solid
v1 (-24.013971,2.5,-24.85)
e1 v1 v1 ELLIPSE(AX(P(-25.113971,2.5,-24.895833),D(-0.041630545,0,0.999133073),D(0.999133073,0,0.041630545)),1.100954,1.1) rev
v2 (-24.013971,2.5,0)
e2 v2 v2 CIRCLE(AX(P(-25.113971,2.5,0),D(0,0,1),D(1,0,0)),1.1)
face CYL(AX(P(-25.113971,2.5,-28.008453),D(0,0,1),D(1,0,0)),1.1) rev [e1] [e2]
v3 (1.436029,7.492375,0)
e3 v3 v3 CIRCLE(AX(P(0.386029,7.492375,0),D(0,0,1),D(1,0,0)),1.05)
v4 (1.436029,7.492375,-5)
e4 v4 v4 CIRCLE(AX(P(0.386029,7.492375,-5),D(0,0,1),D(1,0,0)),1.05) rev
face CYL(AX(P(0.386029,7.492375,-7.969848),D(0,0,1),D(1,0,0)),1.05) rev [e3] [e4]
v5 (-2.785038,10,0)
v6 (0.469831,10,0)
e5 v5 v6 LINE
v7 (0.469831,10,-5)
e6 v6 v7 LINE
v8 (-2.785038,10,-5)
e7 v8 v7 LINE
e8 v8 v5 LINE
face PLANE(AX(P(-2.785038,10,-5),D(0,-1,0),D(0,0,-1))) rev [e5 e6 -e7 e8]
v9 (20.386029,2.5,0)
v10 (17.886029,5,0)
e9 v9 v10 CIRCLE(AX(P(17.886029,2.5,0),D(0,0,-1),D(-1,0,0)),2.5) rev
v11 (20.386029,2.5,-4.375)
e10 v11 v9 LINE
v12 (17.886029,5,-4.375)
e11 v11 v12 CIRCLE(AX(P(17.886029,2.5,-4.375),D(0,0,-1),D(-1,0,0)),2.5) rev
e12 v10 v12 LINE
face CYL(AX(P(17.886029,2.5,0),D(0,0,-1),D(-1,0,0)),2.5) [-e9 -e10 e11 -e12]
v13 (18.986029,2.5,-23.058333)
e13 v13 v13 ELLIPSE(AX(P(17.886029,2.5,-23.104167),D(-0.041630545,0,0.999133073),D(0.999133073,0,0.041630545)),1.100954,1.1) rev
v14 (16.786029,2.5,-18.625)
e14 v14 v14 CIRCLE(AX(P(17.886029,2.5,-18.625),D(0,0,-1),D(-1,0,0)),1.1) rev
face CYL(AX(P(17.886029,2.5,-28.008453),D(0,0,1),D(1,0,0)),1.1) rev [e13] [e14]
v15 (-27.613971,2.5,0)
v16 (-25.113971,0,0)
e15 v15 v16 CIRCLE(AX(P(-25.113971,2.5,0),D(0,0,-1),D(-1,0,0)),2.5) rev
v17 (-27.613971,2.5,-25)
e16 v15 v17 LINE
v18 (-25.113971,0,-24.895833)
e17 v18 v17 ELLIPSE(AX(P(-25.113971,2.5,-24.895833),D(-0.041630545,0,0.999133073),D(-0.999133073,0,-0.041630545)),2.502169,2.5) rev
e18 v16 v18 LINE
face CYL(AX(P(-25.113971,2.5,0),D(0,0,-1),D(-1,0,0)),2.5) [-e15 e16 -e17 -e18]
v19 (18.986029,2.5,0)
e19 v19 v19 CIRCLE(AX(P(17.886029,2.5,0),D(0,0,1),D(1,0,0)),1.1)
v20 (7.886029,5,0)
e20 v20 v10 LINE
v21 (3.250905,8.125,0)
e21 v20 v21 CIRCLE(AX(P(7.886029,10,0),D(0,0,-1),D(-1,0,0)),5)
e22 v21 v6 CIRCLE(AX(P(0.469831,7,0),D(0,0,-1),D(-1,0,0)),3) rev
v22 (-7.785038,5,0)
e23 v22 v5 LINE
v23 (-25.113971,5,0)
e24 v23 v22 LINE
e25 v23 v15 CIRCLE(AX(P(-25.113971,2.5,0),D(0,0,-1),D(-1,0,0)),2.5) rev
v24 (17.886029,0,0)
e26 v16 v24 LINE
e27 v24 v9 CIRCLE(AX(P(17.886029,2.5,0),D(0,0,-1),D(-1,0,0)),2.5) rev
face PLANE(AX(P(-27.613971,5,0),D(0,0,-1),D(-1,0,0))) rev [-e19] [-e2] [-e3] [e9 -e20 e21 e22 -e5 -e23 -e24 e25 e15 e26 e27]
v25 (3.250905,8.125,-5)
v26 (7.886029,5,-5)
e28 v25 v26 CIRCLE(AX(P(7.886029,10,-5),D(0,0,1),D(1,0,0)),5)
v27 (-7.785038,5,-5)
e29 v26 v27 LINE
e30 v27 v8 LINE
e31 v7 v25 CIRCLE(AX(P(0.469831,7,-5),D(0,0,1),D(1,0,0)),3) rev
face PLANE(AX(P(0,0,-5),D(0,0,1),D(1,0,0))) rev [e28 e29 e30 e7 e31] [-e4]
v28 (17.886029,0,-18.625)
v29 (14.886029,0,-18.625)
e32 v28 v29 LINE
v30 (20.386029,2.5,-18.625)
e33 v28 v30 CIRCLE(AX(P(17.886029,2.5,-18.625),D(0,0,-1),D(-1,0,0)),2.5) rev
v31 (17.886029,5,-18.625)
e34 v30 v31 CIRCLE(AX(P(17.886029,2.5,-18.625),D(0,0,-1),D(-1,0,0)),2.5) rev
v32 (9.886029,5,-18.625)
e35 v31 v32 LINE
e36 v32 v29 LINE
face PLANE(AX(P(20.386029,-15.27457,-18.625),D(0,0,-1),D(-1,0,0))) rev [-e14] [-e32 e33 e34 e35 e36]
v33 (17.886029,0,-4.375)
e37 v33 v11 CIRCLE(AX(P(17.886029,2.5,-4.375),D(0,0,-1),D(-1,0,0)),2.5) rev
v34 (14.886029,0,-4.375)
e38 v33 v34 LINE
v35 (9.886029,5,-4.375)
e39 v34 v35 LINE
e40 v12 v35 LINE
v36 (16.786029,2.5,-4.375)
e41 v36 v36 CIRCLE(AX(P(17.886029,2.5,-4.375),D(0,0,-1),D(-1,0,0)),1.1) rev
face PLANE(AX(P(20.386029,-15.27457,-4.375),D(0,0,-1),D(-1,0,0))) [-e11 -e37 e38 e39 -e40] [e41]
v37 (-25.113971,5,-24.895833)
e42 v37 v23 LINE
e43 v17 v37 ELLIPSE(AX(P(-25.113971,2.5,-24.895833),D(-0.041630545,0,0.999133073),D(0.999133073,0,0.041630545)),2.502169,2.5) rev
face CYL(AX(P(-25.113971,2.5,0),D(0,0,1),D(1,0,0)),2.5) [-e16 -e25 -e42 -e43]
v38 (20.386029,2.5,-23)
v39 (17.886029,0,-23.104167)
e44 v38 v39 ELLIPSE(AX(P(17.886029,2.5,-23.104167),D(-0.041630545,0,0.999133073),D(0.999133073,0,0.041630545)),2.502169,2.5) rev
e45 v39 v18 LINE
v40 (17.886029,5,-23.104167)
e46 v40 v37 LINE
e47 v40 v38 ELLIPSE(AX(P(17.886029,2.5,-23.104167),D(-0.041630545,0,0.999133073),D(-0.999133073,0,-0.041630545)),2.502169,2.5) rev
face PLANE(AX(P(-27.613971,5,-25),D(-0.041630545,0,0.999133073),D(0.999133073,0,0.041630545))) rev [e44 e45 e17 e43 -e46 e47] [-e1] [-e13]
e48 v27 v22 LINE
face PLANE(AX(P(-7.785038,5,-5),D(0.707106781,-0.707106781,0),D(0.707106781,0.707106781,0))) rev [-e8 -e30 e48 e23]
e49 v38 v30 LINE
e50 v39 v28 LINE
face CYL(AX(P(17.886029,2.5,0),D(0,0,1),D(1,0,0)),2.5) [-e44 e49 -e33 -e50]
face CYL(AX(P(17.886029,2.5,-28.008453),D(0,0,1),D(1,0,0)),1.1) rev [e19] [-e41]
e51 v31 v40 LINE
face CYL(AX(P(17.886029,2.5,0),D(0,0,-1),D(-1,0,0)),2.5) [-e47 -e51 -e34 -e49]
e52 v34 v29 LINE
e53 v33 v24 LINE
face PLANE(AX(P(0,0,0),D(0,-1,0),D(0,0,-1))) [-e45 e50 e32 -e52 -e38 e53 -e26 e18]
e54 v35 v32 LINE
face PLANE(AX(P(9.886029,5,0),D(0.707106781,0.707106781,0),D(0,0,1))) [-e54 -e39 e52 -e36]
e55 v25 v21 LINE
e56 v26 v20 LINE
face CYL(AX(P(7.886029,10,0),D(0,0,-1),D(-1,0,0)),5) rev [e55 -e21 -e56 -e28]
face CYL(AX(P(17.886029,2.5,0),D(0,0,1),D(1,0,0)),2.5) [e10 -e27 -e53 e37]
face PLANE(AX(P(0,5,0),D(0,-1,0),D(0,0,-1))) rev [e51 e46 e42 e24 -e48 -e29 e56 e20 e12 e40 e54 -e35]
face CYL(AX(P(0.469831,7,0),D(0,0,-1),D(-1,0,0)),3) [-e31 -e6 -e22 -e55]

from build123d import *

# Parameters (mm, degrees)
BOSS_EXTRUDE1_DEPTH = 5
CUT_EXTRUDE1_REACH  = 39.584
SKETCH3_R           = 1.1
FILLET1_R           = 2.5
BOSS_EXTRUDE2_DEPTH = 5
SKETCH7_R           = 1.05
CUT_EXTRUDE3_DEPTH  = 5
FILLET2_R           = 5
CUT_EXTRUDE4_REACH  = 39.584
SKETCH8_W           = 5.5
SKETCH8_H           = 14.25
CHAMFER1_SIZE       = 5
FILLET3_R           = 3


with BuildPart() as part:
    # Sketch1 → Boss-Extrude1 (new body)
    with BuildSketch(Plane(origin=(0, 0, 0), x_dir=(1, 0, 0), z_dir=(0, 1, 0))):
        Polygon((-27.613970588, 0), (20.386029412, 0), (20.386029412, 23), (-27.613970588, 25), align=None)
    extrude(amount=BOSS_EXTRUDE1_DEPTH)

    # Cut-Extrude1: up to this plane
    cut_extrude1_end = Plane(origin=(-27.613970588, 5, -25), z_dir=(-0.04163054471218136, 0, 0.999133073092352))
    # Sketch3 → Cut-Extrude1 (cut, up to the surface)
    with BuildSketch(Plane.XY, mode=Mode.PRIVATE) as cut_extrude1_sk1:
        with Locations((-25.113970588, 2.5)):
            Circle(SKETCH3_R)
    cut_extrude1_tool1 = split(extrude(cut_extrude1_sk1.sketch, amount=-CUT_EXTRUDE1_REACH, mode=Mode.PRIVATE), bisect_by=cut_extrude1_end, keep=Keep.BOTH, mode=Mode.PRIVATE)
    add(cut_extrude1_tool1.solids().sort_by_distance((-25.113971, 2.5, 0))[0], mode=Mode.SUBTRACT)
    # Sketch3 → Cut-Extrude1 (cut, up to the surface)
    with BuildSketch(Plane.XY, mode=Mode.PRIVATE) as cut_extrude1_sk2:
        with Locations((17.886029412, 2.5)):
            Circle(SKETCH3_R)
    cut_extrude1_tool2 = split(extrude(cut_extrude1_sk2.sketch, amount=-CUT_EXTRUDE1_REACH, mode=Mode.PRIVATE), bisect_by=cut_extrude1_end, keep=Keep.BOTH, mode=Mode.PRIVATE)
    add(cut_extrude1_tool2.solids().sort_by_distance((17.886029, 2.5, 0))[0], mode=Mode.SUBTRACT)

    # Fillet1
    fillet1_edges = [part.edges().sort_by_distance(p)[0] for p in [
        (20.386029412, 0, -11.5),
        (20.386029412, 5, -11.5),
        (-27.613970588, 0, -12.5),
        (-27.613970588, 5, -12.5),
    ]]
    fillet(fillet1_edges, radius=FILLET1_R - 0.0001)  # a hair under: the kernel refuses the full size

    # Sketch4 → Boss-Extrude2 (add)
    with BuildSketch(Plane.XY):
        Polygon((-7.7850384, 5), (-2.7850384, 10), (2.886029412, 10), (2.886029412, 5), (-0.713970588, 5), (-4.249504494, 1.464466094), align=None)
    extrude(amount=-BOSS_EXTRUDE2_DEPTH)

    # Sketch7 → Cut-Extrude3 (cut)
    with BuildSketch(Plane.XY):
        with Locations((0.386029412, 7.492375144)):
            Circle(SKETCH7_R)
    extrude(amount=-CUT_EXTRUDE3_DEPTH, mode=Mode.SUBTRACT)

    # Fillet2
    fillet2_edges = [part.edges().sort_by_distance(p)[0] for p in [
        (2.886029412, 5, -2.5),
    ]]
    fillet(fillet2_edges, radius=FILLET2_R - 0.0001)  # a hair under: the kernel refuses the full size

    # Cut-Extrude4: up to this face of the body (flat: up to its plane)
    cut_extrude4_end = Plane(part.part.faces().sort_by_distance((-3.881478864, 0, -12.005573089))[0])
    # Sketch8 → Cut-Extrude4 (cut, up to the picked face)
    with BuildSketch(Plane(origin=(0, 5, 0), x_dir=(1, 0, 0), z_dir=(0, 1, 0)), mode=Mode.PRIVATE) as cut_extrude4_sk1:
        with Locations((17.636029412, 11.5)):
            Rectangle(SKETCH8_W, SKETCH8_H)
    cut_extrude4_tool1 = split(extrude(cut_extrude4_sk1.sketch, amount=-CUT_EXTRUDE4_REACH, mode=Mode.PRIVATE), bisect_by=cut_extrude4_end, keep=Keep.BOTH, mode=Mode.PRIVATE)
    add(cut_extrude4_tool1.solids().sort_by(Axis((17.636029, 5, -11.5), (0, -1, 0)))[0], mode=Mode.SUBTRACT)

    # Chamfer1
    chamfer1_edges = [part.edges().sort_by_distance(p)[0] for p in [
        (14.886029412, 5, -11.5),
    ]]
    chamfer(chamfer1_edges, length=CHAMFER1_SIZE - 0.0001)  # a hair under: the kernel refuses the full size

    # Fillet3
    fillet3_edges = [part.edges().sort_by_distance(p)[0] for p in [
        (2.886029412, 10, -2.5),
    ]]
    fillet(fillet3_edges, radius=FILLET3_R)


solid = part.part
